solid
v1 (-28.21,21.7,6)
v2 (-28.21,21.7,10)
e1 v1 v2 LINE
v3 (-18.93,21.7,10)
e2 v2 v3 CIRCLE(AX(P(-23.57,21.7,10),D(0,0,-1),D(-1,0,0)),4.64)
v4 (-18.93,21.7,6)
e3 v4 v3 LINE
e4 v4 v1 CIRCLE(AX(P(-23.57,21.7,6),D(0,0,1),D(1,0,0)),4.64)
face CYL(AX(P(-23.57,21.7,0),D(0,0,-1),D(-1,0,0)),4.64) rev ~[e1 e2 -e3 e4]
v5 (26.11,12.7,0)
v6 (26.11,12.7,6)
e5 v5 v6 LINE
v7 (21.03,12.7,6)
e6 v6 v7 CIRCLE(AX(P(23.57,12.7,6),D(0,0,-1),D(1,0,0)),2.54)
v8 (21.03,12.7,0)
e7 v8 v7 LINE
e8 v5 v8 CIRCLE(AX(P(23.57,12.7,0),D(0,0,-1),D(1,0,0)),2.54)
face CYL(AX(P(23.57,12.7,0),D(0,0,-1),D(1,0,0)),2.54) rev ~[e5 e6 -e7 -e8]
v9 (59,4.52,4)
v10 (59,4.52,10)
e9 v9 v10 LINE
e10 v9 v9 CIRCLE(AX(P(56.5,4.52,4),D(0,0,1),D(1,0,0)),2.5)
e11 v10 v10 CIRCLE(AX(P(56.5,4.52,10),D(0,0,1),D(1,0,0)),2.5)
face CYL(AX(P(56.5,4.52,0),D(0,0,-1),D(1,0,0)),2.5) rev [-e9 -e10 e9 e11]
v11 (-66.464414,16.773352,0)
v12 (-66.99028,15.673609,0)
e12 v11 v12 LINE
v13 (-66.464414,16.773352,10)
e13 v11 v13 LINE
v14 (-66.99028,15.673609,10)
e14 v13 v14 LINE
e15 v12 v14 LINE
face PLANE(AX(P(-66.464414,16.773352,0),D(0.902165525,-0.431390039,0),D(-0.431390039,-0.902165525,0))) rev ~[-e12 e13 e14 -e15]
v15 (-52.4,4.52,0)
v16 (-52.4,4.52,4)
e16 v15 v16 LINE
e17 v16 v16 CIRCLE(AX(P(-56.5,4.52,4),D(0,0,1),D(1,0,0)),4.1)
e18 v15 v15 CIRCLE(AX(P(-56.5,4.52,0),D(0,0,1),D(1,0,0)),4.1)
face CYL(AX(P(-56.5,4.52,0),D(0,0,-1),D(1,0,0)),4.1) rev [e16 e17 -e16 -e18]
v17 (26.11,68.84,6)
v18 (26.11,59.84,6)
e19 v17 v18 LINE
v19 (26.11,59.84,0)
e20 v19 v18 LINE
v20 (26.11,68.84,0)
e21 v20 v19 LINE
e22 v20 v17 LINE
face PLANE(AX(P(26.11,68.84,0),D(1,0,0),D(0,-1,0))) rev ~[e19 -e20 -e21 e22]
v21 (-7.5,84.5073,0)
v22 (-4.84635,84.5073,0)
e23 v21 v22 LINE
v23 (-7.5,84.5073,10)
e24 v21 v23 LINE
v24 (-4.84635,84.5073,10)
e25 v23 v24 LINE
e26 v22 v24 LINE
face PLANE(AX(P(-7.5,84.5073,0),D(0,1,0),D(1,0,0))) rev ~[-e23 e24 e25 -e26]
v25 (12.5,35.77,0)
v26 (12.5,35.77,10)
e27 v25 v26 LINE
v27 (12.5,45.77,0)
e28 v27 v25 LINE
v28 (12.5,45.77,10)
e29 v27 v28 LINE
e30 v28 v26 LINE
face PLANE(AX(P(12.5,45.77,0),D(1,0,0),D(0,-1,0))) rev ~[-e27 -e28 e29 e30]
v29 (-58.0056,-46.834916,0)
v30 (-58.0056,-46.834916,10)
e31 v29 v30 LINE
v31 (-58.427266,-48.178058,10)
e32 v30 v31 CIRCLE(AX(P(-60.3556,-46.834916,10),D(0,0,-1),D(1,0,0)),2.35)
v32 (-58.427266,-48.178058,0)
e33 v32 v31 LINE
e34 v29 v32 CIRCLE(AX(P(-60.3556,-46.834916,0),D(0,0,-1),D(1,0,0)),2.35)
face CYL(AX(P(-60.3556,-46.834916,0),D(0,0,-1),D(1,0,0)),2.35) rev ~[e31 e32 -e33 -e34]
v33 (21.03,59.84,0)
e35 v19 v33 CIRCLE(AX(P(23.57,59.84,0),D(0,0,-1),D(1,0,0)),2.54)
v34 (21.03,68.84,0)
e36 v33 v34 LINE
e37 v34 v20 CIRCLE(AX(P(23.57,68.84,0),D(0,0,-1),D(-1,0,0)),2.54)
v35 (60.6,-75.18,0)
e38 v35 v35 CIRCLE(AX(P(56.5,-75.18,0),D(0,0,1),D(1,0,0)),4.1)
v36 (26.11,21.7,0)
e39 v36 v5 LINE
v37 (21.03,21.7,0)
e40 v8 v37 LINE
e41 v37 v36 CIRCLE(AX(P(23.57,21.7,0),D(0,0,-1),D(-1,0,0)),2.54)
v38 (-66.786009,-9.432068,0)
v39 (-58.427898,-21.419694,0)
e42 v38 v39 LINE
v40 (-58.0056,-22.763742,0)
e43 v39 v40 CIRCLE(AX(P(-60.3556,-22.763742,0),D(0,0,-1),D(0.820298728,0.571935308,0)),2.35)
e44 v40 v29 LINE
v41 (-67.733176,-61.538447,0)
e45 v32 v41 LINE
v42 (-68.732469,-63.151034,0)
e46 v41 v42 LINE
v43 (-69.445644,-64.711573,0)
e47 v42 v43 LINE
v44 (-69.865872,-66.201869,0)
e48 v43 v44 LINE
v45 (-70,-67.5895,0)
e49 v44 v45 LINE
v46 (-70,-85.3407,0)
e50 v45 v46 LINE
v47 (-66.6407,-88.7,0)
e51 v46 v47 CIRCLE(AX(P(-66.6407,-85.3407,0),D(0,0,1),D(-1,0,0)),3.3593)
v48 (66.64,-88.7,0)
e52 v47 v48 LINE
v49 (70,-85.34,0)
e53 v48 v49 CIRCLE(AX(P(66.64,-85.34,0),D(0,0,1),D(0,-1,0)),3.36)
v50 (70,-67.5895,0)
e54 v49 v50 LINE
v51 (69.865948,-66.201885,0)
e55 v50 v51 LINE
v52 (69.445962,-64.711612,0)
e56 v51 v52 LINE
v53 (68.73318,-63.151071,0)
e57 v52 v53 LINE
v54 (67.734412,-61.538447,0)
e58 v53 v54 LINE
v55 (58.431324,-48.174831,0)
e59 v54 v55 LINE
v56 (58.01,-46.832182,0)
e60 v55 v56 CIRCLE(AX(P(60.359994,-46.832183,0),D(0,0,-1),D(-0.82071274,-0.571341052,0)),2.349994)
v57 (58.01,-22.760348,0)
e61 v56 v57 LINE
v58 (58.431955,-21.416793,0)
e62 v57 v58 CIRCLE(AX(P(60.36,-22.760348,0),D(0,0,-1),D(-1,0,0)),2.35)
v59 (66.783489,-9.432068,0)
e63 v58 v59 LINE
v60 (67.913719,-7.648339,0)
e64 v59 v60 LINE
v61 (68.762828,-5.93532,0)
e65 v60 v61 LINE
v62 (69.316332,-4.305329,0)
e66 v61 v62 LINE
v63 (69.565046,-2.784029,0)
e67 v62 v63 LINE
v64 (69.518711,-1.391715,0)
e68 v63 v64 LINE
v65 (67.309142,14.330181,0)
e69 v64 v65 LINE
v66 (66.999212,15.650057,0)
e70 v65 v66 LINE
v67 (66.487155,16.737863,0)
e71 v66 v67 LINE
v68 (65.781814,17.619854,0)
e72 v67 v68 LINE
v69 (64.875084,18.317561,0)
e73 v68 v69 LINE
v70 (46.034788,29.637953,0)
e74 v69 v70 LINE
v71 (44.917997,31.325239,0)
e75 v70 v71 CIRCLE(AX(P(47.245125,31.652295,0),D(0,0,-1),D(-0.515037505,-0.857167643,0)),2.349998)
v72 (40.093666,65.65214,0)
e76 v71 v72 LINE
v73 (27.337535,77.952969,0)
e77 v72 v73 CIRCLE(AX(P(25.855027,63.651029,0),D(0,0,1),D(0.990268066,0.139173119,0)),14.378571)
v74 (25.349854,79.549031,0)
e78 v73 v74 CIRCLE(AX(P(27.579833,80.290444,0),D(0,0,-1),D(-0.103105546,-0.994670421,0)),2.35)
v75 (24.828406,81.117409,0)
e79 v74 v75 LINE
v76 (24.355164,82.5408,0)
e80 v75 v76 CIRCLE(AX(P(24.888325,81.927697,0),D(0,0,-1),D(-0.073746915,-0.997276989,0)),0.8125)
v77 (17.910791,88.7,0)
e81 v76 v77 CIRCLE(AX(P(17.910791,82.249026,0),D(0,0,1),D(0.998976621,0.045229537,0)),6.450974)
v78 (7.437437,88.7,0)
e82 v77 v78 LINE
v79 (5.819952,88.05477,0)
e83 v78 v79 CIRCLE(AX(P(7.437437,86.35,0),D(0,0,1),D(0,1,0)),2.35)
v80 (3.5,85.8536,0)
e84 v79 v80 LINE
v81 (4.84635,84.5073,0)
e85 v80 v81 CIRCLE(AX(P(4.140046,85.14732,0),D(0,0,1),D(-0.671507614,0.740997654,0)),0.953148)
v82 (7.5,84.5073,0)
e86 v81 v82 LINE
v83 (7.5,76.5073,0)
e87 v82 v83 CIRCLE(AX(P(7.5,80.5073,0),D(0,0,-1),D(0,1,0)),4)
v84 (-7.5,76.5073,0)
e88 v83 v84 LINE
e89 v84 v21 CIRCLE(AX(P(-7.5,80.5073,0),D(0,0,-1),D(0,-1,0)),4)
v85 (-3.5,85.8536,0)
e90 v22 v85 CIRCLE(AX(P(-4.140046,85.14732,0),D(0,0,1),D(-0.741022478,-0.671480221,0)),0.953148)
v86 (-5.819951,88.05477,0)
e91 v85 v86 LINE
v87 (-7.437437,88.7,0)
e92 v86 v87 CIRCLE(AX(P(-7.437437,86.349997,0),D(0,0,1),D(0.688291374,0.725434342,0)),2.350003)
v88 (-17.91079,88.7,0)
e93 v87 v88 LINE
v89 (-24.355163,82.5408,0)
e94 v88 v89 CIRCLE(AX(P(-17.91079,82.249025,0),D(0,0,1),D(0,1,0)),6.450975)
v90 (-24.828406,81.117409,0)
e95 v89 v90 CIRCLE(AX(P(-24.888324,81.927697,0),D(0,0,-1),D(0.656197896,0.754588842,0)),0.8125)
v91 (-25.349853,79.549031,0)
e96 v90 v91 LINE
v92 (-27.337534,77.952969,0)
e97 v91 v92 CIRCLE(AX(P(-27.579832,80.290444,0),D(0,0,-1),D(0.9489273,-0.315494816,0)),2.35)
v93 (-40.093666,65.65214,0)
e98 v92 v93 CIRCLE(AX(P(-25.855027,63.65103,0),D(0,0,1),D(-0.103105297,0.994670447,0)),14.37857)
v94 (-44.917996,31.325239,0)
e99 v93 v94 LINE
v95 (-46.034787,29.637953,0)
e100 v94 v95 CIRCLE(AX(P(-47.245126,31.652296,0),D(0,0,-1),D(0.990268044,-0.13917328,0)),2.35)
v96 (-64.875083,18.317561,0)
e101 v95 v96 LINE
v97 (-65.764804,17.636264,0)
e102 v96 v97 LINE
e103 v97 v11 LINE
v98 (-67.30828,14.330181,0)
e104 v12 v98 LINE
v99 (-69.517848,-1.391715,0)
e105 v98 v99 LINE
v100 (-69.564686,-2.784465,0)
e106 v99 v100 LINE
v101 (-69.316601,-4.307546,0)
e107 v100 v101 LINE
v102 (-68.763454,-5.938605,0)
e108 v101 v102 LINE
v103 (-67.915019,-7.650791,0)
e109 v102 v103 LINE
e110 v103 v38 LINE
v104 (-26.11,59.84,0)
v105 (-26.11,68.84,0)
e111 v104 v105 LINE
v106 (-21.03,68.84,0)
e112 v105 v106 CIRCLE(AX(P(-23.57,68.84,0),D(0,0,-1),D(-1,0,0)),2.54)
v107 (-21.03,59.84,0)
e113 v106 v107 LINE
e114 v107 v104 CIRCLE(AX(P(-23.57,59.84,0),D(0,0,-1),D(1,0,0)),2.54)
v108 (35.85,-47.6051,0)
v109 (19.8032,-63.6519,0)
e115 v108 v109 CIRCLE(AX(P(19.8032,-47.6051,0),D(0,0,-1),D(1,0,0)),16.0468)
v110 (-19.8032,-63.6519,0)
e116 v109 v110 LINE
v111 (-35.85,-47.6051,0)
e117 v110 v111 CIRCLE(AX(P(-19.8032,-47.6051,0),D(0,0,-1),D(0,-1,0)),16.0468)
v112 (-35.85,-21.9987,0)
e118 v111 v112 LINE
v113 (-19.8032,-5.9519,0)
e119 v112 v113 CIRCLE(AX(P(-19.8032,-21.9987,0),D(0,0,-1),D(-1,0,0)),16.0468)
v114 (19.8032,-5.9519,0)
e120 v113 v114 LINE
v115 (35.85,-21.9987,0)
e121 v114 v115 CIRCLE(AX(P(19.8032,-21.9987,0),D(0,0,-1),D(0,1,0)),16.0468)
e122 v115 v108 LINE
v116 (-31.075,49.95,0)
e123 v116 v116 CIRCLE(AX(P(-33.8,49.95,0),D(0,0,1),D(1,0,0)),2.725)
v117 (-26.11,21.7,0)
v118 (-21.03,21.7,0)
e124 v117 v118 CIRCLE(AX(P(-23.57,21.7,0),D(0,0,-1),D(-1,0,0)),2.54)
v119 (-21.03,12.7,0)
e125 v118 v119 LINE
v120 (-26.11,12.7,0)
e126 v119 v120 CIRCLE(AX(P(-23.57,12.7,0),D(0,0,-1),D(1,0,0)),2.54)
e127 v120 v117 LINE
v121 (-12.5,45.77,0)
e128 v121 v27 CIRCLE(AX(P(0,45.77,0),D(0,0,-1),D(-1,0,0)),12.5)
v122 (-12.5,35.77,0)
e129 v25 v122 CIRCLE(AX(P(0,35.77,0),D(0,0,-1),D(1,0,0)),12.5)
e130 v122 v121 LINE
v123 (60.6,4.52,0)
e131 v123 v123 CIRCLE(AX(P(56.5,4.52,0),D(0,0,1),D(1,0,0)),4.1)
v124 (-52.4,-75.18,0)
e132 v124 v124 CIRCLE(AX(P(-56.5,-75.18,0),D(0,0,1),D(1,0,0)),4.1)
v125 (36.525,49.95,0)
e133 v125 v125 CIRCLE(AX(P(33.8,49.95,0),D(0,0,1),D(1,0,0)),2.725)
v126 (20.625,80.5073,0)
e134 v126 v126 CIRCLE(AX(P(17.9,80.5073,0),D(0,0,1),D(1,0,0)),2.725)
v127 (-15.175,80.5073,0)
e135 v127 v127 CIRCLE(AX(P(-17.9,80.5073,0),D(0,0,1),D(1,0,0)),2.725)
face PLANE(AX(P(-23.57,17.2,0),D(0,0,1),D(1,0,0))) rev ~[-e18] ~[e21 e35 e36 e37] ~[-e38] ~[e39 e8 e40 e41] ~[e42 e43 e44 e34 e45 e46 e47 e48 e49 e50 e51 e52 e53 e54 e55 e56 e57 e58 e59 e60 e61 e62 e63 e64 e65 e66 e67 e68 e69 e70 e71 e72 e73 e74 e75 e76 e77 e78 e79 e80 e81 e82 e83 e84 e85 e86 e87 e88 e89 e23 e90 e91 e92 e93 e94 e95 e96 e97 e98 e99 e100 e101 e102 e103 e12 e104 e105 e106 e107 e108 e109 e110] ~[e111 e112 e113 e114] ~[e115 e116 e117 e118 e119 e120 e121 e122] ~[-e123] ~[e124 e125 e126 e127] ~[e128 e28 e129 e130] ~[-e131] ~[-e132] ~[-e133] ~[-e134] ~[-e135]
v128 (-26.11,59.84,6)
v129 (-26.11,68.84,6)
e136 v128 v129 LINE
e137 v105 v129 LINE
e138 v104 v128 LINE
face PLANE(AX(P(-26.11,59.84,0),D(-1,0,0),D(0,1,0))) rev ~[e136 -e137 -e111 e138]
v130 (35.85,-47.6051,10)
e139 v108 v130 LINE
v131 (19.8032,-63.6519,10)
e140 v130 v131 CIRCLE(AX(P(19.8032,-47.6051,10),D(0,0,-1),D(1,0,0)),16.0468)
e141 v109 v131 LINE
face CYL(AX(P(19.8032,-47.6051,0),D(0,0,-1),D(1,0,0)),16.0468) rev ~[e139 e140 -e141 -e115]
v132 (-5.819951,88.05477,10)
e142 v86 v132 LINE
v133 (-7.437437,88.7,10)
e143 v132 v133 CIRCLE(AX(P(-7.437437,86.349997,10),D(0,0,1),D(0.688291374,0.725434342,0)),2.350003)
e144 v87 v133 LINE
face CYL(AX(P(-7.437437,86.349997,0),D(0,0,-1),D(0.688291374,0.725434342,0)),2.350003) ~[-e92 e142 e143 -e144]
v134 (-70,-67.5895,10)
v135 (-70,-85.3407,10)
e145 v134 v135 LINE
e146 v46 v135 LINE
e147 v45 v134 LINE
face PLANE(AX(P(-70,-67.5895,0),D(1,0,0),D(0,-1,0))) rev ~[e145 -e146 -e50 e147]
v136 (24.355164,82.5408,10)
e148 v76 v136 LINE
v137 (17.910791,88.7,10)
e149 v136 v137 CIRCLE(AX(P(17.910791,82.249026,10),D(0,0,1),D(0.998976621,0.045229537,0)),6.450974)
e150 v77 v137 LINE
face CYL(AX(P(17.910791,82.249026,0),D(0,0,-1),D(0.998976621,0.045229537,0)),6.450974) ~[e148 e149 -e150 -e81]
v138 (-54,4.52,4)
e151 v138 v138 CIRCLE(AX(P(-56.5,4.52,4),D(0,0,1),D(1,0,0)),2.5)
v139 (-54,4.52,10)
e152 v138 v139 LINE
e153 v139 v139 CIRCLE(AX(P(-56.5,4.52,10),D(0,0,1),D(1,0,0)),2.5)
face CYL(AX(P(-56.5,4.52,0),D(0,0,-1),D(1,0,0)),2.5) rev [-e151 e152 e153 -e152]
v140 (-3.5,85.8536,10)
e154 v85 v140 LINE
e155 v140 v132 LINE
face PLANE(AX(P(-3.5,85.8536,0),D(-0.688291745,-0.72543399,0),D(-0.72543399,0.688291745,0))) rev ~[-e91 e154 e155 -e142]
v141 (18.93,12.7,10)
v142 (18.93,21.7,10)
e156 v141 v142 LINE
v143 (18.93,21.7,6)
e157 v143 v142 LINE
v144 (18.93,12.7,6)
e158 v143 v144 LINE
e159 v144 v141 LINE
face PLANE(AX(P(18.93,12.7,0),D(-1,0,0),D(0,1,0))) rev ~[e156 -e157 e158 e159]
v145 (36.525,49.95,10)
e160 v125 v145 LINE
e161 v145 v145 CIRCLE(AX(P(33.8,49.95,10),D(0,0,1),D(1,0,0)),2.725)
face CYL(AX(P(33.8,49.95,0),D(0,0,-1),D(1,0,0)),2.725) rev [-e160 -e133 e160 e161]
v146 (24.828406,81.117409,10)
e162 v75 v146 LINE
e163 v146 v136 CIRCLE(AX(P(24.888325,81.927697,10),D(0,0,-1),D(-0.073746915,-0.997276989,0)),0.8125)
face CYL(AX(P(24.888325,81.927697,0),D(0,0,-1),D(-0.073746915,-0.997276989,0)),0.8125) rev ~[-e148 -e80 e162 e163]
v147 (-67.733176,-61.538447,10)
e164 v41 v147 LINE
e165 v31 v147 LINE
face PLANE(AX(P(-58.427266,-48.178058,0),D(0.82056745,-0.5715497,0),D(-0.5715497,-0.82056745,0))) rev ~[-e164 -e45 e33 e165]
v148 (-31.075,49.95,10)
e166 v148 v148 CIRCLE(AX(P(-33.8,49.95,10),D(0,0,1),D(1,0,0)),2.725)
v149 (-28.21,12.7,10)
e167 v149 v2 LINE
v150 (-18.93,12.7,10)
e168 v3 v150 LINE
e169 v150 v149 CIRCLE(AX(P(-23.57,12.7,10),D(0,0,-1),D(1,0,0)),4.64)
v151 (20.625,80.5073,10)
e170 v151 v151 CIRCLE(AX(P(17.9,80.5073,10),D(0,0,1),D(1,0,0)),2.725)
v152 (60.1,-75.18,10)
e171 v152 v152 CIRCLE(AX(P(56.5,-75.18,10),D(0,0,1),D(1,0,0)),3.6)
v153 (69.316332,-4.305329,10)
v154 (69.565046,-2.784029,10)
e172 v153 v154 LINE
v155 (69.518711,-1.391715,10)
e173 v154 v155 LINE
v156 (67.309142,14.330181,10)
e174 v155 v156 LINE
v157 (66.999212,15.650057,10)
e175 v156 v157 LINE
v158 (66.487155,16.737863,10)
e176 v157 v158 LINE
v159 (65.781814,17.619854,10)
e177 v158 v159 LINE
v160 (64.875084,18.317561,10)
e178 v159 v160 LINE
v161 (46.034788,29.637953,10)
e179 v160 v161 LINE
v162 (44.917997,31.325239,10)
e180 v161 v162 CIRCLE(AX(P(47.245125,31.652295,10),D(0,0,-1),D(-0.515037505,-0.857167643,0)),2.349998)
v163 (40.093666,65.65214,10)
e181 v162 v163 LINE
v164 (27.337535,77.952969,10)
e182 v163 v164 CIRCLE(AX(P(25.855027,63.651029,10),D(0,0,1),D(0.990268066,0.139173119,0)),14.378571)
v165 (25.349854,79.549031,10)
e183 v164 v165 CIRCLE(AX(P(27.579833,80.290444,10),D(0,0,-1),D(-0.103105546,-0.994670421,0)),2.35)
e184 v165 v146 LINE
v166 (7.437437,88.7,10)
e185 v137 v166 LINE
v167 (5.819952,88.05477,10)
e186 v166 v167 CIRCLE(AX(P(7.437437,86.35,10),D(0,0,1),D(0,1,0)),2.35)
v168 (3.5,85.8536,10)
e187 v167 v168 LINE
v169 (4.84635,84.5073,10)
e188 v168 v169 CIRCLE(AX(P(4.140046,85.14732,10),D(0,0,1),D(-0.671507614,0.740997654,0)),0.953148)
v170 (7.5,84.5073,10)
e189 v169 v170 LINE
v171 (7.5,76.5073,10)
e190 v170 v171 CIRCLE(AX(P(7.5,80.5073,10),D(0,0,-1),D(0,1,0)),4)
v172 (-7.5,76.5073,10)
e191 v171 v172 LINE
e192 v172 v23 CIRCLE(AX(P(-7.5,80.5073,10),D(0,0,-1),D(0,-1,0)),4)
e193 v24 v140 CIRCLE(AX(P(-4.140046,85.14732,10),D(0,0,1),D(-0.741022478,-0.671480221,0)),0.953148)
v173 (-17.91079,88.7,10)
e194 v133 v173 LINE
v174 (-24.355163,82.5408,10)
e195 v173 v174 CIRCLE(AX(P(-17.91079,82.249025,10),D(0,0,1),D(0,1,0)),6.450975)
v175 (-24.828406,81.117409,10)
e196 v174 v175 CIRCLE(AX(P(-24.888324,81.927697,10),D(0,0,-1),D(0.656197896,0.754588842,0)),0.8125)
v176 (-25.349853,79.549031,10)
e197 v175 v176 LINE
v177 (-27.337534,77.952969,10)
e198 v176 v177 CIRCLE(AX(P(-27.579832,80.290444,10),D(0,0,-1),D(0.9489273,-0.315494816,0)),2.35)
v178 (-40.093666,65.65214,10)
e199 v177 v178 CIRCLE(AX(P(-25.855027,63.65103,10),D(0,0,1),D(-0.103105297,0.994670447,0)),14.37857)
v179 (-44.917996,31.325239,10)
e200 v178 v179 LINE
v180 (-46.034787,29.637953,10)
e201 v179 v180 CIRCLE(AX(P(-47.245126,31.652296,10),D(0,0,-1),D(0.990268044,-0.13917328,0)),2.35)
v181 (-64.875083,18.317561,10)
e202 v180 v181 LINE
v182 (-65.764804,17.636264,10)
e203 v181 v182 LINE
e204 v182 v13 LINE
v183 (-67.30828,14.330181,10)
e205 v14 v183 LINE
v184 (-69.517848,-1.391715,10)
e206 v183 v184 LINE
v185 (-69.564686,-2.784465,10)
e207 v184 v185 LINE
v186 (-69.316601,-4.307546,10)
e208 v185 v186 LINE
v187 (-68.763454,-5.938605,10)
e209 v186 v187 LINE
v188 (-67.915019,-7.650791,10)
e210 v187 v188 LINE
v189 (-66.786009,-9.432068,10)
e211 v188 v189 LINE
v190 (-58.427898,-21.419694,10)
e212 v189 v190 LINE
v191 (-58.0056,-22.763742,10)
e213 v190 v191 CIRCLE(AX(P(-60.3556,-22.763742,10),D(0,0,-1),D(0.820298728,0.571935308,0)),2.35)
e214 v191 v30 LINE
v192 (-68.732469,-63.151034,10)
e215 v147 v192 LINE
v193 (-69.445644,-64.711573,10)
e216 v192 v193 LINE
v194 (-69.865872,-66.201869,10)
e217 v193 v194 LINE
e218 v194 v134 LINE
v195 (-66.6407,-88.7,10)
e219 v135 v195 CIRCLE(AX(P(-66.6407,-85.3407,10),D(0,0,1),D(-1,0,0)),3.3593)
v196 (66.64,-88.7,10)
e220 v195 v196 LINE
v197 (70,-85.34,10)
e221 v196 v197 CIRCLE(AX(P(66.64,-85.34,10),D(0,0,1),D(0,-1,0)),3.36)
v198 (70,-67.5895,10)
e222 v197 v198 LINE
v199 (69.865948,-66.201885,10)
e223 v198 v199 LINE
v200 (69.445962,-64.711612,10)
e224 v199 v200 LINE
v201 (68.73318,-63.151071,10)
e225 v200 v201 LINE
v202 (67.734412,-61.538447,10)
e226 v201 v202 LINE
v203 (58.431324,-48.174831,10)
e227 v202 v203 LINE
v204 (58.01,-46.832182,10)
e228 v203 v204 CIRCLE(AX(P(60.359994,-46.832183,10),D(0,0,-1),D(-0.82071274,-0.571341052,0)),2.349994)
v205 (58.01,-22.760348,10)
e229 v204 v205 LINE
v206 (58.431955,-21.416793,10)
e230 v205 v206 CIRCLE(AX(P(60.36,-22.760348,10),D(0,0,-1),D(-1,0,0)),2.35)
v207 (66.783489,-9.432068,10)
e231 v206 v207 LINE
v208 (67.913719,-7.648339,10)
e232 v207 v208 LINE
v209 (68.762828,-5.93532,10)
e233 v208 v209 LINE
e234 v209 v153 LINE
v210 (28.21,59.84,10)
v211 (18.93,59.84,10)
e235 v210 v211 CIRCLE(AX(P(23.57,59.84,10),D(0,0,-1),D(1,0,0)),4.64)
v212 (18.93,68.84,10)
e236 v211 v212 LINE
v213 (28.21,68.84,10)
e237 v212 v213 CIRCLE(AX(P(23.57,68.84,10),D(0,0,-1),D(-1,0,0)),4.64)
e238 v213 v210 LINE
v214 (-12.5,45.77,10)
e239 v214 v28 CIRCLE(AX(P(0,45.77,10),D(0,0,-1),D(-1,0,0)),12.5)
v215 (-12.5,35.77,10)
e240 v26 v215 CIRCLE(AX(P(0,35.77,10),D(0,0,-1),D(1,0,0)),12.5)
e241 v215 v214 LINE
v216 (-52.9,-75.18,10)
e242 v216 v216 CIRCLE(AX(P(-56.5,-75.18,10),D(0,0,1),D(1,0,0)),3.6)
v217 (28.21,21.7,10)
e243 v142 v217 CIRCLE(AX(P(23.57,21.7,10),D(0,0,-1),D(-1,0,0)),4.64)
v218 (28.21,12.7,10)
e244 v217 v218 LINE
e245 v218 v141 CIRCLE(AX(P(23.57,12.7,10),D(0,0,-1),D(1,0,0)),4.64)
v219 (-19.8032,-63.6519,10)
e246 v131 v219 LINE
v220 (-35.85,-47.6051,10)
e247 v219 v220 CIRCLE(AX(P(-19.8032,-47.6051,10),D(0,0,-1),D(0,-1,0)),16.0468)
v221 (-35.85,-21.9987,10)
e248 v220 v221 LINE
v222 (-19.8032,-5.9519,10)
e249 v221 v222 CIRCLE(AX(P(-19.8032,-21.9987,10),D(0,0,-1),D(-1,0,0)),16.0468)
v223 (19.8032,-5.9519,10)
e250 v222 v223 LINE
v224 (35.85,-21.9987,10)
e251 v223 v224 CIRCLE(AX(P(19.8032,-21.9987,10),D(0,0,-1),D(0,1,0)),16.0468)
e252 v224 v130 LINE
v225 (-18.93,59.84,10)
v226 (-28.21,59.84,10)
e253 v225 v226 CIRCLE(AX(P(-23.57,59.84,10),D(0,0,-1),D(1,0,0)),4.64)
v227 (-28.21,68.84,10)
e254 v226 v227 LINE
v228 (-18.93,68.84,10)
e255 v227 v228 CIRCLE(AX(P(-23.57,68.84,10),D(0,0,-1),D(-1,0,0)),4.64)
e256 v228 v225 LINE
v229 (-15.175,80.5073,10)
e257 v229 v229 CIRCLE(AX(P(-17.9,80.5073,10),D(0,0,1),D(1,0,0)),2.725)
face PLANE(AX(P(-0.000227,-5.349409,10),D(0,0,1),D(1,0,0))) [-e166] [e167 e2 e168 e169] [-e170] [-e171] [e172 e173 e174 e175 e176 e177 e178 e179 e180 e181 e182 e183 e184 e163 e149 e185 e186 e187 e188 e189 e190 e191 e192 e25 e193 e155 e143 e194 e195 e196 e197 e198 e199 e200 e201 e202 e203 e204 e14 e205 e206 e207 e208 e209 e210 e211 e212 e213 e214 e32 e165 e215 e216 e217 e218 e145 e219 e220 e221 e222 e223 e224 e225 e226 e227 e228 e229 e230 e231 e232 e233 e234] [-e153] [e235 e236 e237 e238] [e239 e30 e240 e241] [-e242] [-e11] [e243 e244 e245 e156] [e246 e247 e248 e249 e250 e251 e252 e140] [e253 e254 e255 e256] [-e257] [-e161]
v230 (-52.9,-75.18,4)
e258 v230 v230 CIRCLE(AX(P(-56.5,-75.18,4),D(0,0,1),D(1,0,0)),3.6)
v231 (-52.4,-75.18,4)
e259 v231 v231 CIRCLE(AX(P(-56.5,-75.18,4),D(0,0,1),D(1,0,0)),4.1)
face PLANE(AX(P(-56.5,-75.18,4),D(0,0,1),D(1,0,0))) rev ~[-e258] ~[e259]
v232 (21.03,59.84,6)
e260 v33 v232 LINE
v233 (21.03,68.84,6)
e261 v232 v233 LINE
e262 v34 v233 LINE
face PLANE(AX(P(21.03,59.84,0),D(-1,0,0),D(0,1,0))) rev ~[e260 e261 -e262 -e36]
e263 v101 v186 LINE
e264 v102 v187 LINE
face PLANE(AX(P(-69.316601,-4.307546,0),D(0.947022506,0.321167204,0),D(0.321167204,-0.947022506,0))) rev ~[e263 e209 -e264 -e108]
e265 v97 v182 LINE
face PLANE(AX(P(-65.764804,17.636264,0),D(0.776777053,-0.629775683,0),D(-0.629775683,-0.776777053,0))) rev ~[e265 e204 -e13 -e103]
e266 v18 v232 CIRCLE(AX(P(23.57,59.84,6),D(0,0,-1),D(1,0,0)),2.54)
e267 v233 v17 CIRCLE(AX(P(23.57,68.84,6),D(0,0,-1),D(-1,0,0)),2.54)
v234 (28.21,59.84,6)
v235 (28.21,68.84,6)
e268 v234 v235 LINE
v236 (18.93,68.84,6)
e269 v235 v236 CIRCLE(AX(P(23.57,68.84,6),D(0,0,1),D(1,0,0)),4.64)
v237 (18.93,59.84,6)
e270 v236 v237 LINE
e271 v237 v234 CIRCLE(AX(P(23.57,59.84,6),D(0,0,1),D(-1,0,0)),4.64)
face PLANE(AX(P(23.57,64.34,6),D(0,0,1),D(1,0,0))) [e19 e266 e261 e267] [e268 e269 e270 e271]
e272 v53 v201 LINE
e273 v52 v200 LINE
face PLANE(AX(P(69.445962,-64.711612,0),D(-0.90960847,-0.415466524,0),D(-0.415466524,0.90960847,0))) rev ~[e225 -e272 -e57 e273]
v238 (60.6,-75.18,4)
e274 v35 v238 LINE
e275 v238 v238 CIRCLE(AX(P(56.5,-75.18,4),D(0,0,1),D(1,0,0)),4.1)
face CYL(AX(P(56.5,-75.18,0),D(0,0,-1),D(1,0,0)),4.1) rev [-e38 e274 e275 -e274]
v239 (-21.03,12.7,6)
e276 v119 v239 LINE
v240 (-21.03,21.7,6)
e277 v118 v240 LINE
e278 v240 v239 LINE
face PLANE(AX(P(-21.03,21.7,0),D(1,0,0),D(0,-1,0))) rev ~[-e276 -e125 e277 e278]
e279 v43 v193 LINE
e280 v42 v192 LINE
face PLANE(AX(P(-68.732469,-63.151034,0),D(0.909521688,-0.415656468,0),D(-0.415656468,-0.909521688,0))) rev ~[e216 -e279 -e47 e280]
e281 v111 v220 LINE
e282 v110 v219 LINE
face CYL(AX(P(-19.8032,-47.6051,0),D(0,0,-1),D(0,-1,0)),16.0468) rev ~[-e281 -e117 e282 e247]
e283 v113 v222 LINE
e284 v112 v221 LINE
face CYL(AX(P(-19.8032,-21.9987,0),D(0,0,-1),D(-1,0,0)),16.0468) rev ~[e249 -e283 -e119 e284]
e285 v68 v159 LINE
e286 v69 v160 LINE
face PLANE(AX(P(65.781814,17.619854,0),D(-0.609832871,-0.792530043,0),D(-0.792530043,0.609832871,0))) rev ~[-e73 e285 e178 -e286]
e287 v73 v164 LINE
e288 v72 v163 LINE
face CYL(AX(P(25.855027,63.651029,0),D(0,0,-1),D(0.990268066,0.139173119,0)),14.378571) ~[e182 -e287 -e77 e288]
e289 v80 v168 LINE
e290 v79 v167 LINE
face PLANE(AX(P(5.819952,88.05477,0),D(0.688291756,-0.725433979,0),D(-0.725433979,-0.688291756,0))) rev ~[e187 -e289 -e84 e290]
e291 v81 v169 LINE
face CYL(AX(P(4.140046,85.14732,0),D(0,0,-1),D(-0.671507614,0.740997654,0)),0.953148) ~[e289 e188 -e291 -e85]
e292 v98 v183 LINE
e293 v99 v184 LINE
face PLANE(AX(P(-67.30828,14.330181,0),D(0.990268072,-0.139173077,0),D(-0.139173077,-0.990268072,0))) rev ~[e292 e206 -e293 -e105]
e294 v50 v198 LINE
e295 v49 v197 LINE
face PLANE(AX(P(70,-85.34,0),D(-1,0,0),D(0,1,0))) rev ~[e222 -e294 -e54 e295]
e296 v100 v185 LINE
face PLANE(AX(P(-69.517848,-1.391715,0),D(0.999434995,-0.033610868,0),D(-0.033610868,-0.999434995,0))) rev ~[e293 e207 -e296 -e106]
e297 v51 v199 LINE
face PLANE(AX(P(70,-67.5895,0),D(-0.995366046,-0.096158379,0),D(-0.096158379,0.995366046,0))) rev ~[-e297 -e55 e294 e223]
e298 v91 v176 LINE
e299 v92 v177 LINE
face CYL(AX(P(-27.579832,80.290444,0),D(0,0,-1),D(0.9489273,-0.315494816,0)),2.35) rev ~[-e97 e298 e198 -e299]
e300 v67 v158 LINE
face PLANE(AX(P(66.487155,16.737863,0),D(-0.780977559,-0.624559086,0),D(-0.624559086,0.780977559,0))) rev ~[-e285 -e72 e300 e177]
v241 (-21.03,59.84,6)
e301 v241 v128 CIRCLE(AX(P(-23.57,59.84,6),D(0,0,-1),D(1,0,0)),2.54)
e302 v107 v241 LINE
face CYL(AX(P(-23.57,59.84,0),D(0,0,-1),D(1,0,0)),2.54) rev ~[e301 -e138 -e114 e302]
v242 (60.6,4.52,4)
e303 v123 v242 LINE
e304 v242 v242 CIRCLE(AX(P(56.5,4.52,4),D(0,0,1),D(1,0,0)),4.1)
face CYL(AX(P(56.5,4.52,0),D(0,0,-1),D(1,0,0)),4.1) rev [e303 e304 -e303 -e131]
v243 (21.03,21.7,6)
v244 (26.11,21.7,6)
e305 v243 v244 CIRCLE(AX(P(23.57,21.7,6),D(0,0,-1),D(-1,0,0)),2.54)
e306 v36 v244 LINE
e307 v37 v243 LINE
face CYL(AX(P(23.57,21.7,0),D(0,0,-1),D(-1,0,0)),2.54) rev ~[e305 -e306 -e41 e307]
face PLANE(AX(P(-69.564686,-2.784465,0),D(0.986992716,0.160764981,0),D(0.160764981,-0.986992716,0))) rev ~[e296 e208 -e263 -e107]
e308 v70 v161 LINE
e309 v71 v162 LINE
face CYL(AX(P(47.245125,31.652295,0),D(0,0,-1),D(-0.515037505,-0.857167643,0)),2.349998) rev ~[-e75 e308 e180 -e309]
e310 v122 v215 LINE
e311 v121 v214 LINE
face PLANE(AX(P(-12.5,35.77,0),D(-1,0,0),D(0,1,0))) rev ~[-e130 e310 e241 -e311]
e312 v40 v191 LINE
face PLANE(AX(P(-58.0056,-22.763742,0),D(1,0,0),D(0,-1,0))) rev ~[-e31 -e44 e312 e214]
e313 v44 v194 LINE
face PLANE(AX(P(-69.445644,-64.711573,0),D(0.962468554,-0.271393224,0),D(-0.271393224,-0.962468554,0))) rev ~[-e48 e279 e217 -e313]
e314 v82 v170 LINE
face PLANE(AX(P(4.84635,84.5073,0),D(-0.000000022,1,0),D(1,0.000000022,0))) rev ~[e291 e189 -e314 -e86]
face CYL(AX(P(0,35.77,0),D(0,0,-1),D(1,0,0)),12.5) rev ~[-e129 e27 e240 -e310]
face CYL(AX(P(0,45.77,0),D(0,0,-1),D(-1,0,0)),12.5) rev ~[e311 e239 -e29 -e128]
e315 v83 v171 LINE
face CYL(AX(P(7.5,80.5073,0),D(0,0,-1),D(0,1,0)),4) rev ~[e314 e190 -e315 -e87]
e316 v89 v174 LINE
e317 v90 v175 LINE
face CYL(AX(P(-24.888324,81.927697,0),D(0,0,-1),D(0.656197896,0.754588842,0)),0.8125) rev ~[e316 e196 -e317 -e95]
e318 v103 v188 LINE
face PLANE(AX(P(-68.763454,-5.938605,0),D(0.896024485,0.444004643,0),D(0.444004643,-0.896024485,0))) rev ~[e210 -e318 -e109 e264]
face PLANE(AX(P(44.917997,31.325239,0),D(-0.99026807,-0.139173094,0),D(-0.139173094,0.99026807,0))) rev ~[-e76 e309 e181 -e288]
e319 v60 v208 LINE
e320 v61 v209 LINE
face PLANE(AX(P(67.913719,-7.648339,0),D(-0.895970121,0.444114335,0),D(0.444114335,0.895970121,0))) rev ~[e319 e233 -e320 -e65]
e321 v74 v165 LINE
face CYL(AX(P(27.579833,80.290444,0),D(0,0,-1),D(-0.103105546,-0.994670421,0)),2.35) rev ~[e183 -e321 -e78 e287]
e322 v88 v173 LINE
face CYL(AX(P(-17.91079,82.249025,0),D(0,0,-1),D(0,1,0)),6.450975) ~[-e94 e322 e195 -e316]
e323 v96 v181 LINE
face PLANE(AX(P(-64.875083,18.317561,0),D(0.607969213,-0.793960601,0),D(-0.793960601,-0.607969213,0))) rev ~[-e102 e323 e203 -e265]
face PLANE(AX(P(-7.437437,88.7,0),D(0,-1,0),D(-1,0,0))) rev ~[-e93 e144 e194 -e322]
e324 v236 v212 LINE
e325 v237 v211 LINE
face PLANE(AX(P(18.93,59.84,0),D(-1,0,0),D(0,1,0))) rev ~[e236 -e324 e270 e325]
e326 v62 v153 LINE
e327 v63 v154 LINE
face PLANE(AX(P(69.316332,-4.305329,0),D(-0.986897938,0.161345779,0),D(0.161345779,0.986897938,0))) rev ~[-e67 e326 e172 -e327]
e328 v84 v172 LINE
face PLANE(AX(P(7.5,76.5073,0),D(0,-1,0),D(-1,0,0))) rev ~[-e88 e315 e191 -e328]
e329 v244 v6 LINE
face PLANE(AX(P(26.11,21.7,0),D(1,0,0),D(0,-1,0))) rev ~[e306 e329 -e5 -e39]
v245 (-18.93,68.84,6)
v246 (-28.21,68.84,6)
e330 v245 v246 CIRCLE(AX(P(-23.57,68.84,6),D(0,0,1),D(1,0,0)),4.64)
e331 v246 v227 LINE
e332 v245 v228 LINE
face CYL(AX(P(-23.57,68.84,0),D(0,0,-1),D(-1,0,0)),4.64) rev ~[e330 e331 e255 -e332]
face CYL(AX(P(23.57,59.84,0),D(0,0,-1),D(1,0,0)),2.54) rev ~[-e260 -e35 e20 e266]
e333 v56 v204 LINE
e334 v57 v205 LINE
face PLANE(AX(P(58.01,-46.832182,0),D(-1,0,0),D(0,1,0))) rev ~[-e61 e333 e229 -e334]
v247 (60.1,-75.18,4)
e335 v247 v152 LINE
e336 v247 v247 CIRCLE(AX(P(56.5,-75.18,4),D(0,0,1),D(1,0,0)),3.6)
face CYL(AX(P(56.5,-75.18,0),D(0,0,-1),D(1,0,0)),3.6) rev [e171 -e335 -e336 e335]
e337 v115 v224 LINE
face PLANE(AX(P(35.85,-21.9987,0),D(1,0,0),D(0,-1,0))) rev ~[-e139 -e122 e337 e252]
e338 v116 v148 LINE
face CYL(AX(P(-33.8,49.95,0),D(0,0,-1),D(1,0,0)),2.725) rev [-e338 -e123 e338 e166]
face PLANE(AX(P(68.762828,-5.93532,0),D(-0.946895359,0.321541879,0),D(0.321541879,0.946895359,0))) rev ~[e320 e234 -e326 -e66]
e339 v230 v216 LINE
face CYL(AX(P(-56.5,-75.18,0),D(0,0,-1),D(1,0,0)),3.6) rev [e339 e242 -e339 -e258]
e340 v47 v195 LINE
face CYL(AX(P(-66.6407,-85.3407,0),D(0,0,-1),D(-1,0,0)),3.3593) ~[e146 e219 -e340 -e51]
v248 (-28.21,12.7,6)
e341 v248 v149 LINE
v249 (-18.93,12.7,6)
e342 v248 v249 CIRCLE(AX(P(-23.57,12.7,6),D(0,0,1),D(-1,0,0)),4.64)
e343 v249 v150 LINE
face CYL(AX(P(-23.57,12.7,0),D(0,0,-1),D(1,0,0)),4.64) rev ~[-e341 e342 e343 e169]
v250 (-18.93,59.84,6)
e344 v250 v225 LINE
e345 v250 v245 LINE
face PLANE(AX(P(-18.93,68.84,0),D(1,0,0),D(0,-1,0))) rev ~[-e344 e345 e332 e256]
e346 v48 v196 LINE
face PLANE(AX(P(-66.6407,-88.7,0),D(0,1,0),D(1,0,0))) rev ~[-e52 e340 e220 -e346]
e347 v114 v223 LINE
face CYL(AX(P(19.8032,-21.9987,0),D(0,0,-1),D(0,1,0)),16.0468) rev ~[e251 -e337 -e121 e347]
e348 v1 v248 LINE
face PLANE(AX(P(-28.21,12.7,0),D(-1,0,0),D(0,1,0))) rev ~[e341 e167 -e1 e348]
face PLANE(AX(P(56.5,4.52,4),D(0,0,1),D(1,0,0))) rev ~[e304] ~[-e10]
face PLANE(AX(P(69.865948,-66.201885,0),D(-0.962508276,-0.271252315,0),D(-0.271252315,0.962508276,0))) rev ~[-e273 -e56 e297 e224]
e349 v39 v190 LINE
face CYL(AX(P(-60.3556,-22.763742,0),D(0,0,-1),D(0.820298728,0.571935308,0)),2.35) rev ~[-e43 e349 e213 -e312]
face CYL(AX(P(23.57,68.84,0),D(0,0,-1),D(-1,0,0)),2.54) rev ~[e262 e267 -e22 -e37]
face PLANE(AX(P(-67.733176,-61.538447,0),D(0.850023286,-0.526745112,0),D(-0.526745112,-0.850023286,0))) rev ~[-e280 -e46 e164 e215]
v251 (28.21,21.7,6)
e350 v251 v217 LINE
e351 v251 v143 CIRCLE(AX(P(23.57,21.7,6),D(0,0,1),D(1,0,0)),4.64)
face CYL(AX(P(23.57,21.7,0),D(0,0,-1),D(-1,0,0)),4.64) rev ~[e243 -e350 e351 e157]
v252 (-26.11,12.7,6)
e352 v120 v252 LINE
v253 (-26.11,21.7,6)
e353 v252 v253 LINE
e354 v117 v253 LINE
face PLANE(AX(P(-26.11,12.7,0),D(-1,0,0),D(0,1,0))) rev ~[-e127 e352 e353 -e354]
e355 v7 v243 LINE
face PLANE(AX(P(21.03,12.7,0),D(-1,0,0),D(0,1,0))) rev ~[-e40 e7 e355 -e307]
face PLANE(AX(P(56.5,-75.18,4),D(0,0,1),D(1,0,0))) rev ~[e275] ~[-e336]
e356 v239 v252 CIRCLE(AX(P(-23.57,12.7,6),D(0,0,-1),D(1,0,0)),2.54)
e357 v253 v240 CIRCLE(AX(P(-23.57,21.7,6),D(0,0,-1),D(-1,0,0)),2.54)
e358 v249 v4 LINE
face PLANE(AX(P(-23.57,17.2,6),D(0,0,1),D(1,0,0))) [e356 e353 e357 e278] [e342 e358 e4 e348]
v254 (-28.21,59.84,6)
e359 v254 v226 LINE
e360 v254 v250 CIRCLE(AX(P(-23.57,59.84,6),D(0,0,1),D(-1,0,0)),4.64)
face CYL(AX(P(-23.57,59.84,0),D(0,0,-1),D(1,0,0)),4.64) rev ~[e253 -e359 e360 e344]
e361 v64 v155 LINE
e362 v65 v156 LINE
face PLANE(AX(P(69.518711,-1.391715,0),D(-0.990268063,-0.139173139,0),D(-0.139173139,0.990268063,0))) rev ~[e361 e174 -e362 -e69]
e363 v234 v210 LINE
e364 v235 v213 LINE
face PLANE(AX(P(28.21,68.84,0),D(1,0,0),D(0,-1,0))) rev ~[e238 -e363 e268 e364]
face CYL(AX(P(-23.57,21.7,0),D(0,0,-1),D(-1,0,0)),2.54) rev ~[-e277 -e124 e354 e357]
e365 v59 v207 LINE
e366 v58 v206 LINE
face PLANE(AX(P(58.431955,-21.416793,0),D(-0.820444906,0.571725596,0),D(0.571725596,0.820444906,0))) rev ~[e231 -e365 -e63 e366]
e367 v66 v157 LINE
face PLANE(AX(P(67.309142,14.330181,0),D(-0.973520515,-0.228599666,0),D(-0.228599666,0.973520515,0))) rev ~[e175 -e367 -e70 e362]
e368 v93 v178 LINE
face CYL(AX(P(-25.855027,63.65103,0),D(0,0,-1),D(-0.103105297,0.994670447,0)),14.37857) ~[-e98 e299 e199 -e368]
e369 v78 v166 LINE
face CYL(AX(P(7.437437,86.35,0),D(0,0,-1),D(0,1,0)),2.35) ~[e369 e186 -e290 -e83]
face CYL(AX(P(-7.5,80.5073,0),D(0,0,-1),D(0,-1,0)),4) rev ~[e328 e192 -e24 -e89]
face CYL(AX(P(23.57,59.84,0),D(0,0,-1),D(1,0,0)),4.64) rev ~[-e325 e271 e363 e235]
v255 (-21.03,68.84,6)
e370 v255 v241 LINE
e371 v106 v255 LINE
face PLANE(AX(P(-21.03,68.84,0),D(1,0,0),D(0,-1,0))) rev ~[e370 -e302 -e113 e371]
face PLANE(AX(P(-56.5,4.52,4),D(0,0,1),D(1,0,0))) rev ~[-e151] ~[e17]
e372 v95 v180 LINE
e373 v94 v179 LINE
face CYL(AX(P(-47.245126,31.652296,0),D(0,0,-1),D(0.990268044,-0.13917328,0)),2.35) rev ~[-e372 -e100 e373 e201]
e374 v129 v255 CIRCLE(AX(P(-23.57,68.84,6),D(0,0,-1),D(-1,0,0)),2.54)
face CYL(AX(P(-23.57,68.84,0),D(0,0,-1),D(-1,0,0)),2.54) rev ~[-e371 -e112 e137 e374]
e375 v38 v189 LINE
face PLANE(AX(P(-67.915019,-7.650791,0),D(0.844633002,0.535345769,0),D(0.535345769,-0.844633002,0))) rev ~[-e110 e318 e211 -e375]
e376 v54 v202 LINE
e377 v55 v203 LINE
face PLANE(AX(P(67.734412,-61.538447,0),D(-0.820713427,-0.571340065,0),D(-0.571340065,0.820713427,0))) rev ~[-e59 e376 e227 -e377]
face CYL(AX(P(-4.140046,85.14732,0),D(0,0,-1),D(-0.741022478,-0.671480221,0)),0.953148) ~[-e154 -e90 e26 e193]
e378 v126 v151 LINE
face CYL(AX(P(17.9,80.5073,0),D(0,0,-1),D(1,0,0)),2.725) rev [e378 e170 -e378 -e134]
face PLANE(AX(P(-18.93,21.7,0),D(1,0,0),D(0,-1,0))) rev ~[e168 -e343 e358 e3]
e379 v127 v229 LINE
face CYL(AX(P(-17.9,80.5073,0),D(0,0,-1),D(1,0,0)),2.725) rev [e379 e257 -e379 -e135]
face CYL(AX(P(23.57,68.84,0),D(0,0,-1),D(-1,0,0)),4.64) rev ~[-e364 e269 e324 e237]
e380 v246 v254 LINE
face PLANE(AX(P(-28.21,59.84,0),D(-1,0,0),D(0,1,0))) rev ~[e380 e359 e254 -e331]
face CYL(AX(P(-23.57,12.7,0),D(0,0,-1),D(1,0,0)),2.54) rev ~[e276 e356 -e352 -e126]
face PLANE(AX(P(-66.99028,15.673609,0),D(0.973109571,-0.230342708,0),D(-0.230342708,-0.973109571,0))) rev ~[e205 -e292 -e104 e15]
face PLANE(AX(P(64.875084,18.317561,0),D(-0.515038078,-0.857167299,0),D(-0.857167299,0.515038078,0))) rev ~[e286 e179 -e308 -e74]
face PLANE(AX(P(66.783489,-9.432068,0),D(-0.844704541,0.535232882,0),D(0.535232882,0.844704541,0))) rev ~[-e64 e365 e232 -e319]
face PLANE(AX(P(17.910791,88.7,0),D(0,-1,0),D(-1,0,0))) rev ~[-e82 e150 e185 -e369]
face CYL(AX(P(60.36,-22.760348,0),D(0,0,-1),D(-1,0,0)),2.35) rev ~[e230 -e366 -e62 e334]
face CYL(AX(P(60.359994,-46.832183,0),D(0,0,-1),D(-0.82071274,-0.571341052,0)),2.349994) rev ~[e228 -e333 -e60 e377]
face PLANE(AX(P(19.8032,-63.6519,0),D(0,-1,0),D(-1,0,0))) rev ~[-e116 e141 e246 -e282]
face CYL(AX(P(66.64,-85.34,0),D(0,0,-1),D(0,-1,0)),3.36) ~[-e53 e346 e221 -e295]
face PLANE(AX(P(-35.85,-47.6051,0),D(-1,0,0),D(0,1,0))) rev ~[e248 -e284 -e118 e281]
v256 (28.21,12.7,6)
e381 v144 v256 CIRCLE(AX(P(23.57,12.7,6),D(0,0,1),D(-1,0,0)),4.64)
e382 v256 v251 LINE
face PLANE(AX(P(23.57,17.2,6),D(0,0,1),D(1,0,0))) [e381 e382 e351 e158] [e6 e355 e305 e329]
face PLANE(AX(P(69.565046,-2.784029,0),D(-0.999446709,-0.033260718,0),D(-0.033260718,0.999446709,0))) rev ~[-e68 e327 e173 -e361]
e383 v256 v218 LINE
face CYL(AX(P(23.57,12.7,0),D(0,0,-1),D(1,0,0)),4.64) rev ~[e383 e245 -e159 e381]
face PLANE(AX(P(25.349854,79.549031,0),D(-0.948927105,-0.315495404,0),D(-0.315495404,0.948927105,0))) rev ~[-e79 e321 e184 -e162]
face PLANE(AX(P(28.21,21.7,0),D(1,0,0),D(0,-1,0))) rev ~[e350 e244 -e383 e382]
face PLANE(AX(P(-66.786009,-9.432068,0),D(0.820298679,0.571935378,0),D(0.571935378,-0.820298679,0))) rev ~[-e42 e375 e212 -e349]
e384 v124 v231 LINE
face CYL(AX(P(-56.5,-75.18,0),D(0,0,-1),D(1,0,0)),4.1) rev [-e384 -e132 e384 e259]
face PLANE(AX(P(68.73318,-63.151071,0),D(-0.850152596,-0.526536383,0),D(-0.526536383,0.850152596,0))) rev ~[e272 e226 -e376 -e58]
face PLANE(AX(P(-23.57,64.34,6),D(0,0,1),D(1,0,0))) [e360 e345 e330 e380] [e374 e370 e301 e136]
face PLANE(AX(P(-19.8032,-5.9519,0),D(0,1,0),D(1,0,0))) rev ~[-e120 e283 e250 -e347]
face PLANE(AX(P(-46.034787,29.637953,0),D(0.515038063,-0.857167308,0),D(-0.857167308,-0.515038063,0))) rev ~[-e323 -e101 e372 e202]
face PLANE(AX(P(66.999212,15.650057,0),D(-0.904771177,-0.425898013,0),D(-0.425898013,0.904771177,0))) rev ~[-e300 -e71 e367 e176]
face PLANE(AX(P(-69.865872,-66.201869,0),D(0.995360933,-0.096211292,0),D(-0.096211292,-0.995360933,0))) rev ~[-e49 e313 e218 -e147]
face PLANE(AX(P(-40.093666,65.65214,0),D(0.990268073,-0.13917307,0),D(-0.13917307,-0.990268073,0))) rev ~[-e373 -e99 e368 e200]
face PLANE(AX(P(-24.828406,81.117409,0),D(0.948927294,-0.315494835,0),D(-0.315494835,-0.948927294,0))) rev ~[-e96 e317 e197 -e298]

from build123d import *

# Parameters (mm, degrees)
F0_R     = 4.1
F0_R_2   = 2.725
F0_R_3   = 2.5
F0_R_4   = 3.6
F1_DEPTH = 10
F2_DEPTH = 6
F3_DEPTH = 4


# Not quite as in the source:
# - ends of sketch curves that miss each other by under 0.0002 mm in the source are joined


with BuildPart() as f1:
    # F0 (on Top) → F1 (new body)
    with BuildSketch(Plane.XY):
        with BuildLine():
            ThreePointArc((-70, -85.3407), (-69.01608381, -87.71608381), (-66.6407, -88.7))
            Line((-66.6407, -88.7), (66.64, -88.7))
            ThreePointArc((66.64, -88.7), (69.0158787848, -87.7158787848), (70, -85.34))
            Line((70, -85.34), (70, -67.5895))
            Line((70, -67.5895), (69.865948, -66.201885))
            Line((69.865948, -66.201885), (69.445962, -64.711612))
            Line((69.445962, -64.711612), (68.73318, -63.151071))
            Line((68.73318, -63.151071), (67.734412, -61.538447))
            Line((67.734412, -61.538447), (58.431324, -48.174831))
            ThreePointArc((58.431324, -48.174831), (58.1178035717, -47.5357835753), (58.01, -46.832182))
            Line((58.01, -46.832182), (58.01, -22.760348))
            ThreePointArc((58.01, -22.760348), (58.1179689174, -22.0562197272), (58.4319545741, -21.4167927032))
            Line((58.4319545741, -21.4167927032), (66.783489, -9.432068))
            Line((66.783489, -9.432068), (67.913719, -7.648339))
            Line((67.913719, -7.648339), (68.762828, -5.93532))
            Line((68.762828, -5.93532), (69.316332, -4.305329))
            Line((69.316332, -4.305329), (69.565046, -2.784029))
            Line((69.565046, -2.784029), (69.518711, -1.391715))
            Line((69.518711, -1.391715), (67.309142, 14.330181))
            Line((67.309142, 14.330181), (66.999212, 15.650057))
            Line((66.999212, 15.650057), (66.487155, 16.737863))
            Line((66.487155, 16.737863), (65.781814, 17.619854))
            Line((65.781814, 17.619854), (64.875084, 18.317561))
            Line((64.875084, 18.317561), (46.034788, 29.637953))
            ThreePointArc((46.034788, 29.637953), (45.2854954651, 30.3552438624), (44.917997067, 31.3252390094))
            Line((44.917997067, 31.3252390094), (40.093666, 65.65214))
            ThreePointArc((40.093666, 65.65214), (35.8358190199, 74.0012505725), (27.3375349502, 77.9529685197))
            ThreePointArc((27.3375349502, 77.9529685197), (26.1084756666, 78.4580664195), (25.3498539146, 79.5490309716))
            Line((25.3498539146, 79.5490309716), (24.828406, 81.117409))
            ThreePointArc((24.828406, 81.117409), (24.1173215696, 81.671357459), (24.355163875, 82.5408001437))
            ThreePointArc((24.355163875, 82.5408001437), (22.3679675258, 86.9125704183), (17.910791, 88.7))
            Line((17.910791, 88.7), (7.437437, 88.7))
            ThreePointArc((7.437437, 88.7), (6.5667217917, 88.5327402562), (5.8199517771, 88.0547702349))
            Line((5.8199517771, 88.0547702349), (3.5, 85.8536))
            ThreePointArc((3.5, 85.8536), (3.4660810953, 84.4733300764), (4.8463500657, 84.5072999404))
            Line((4.8463500657, 84.5072999404), (7.5, 84.5073))
            ThreePointArc((7.5, 84.5073), (11.5, 80.5073), (7.5, 76.5073))
            Line((7.5, 76.5073), (-7.5, 76.5073))
            ThreePointArc((-7.5, 76.5073), (-11.5, 80.5073), (-7.5, 84.5073))
            Line((-7.5, 84.5073), (-4.84635, 84.5073))
            ThreePointArc((-4.84635, 84.5073), (-3.4660810953, 84.4733300764), (-3.4999997219, 85.8536003068))
            Line((-3.4999997219, 85.8536003068), (-5.819951, 88.05477))
            ThreePointArc((-5.819951, 88.05477), (-6.5667214548, 88.5327401218), (-7.437437, 88.7))
            Line((-7.437437, 88.7), (-17.91079, 88.7))
            ThreePointArc((-17.91079, 88.7), (-22.3679665258, 86.9125704183), (-24.3551631887, 82.5408000085))
            ThreePointArc((-24.3551631887, 82.5408000085), (-24.1173207269, 81.6713569858), (-24.8284060254, 81.1174093435))
            Line((-24.8284060254, 81.1174093435), (-25.349853, 79.549031))
            ThreePointArc((-25.349853, 79.549031), (-26.1084746666, 78.4580664195), (-27.3375339495, 77.9529685125))
            ThreePointArc((-27.3375339495, 77.9529685125), (-35.8358186118, 74.001250966), (-40.0936657548, 65.6521401061))
            Line((-40.0936657548, 65.6521401061), (-44.917996, 31.325239))
            ThreePointArc((-44.917996, 31.325239), (-45.2854944651, 30.3552438624), (-46.0347868046, 29.6379526747))
            Line((-46.0347868046, 29.6379526747), (-64.875083, 18.317561))
            Line((-64.875083, 18.317561), (-65.764804, 17.636264))
            Line((-65.764804, 17.636264), (-66.464414, 16.773352))
            Line((-66.464414, 16.773352), (-66.99028, 15.673609))
            Line((-66.99028, 15.673609), (-67.30828, 14.330181))
            Line((-67.30828, 14.330181), (-69.517848, -1.391715))
            Line((-69.517848, -1.391715), (-69.564686, -2.784465))
            Line((-69.564686, -2.784465), (-69.316601, -4.307546))
            Line((-69.316601, -4.307546), (-68.763454, -5.938605))
            Line((-68.763454, -5.938605), (-67.915019, -7.650791))
            Line((-67.915019, -7.650791), (-66.786009, -9.432068))
            Line((-66.786009, -9.432068), (-58.427898, -21.419694))
            ThreePointArc((-58.427898, -21.419694), (-58.1136589115, -22.059327239), (-58.0056, -22.763742))
            Line((-58.0056, -22.763742), (-58.0056, -46.834916))
            ThreePointArc((-58.0056, -46.834916), (-58.1134934129, -47.5388038122), (-58.4272664273, -48.1780577023))
            Line((-58.4272664273, -48.1780577023), (-67.733176, -61.538447))
            Line((-67.733176, -61.538447), (-68.732469, -63.151034))
            Line((-68.732469, -63.151034), (-69.445644, -64.711573))
            Line((-69.445644, -64.711573), (-69.865872, -66.201869))
            Line((-69.865872, -66.201869), (-70, -67.5895))
            Line((-70, -67.5895), (-70, -85.3407))
        make_face()
        with Locations((-56.5, -75.18)):
            Circle(F0_R, mode=Mode.SUBTRACT)
        with Locations((56.5, -75.18)):
            Circle(F0_R, mode=Mode.SUBTRACT)
        with BuildLine():
            Line((19.8032, -63.6519), (-19.8032, -63.6519))
            ThreePointArc((-19.8032, -63.6519), (-31.1500010963, -58.9519010963), (-35.85, -47.6051))
            Line((-35.85, -47.6051), (-35.85, -21.9987))
            ThreePointArc((-35.85, -21.9987), (-31.1500010963, -10.6518989037), (-19.8032, -5.9519))
            Line((-19.8032, -5.9519), (19.8032, -5.9519))
            ThreePointArc((19.8032, -5.9519), (31.1500010963, -10.6518989037), (35.85, -21.9987))
            Line((35.85, -21.9987), (35.85, -47.6051))
            ThreePointArc((35.85, -47.6051), (31.1500010963, -58.9519010963), (19.8032, -63.6519))
        make_face(mode=Mode.SUBTRACT)
        with Locations((-56.5, 4.52)):
            Circle(F0_R, mode=Mode.SUBTRACT)
        with BuildLine():
            Line((-28.21, 12.7), (-28.21, 21.7))
            ThreePointArc((-28.21, 21.7), (-23.57, 26.34), (-18.93, 21.7))
            Line((-18.93, 21.7), (-18.93, 12.7))
            ThreePointArc((-18.93, 12.7), (-23.57, 8.06), (-28.21, 12.7))
        make_face(mode=Mode.SUBTRACT)
        with Locations((-33.8, 49.95)):
            Circle(F0_R_2, mode=Mode.SUBTRACT)
        with BuildLine():
            Line((-28.21, 59.84), (-28.21, 68.84))
            ThreePointArc((-28.21, 68.84), (-23.57, 73.48), (-18.93, 68.84))
            Line((-18.93, 68.84), (-18.93, 59.84))
            ThreePointArc((-18.93, 59.84), (-23.57, 55.2), (-28.21, 59.84))
        make_face(mode=Mode.SUBTRACT)
        with Locations((-17.9, 80.5073)):
            Circle(F0_R_2, mode=Mode.SUBTRACT)
        with BuildLine():
            Line((18.93, 12.7), (18.93, 21.7))
            ThreePointArc((18.93, 21.7), (23.57, 26.34), (28.21, 21.7))
            Line((28.21, 21.7), (28.21, 12.7))
            ThreePointArc((28.21, 12.7), (23.57, 8.06), (18.93, 12.7))
        make_face(mode=Mode.SUBTRACT)
        with BuildLine():
            Line((-12.5, 35.77), (-12.5, 45.77))
            ThreePointArc((-12.5, 45.77), (0, 58.27), (12.5, 45.77))
            Line((12.5, 45.77), (12.5, 35.77))
            ThreePointArc((12.5, 35.77), (0, 23.27), (-12.5, 35.77))
        make_face(mode=Mode.SUBTRACT)
        with Locations((56.5, 4.52)):
            Circle(F0_R, mode=Mode.SUBTRACT)
        with Locations((33.8, 49.95)):
            Circle(F0_R_2, mode=Mode.SUBTRACT)
        with BuildLine():
            Line((18.93, 59.84), (18.93, 68.84))
            ThreePointArc((18.93, 68.84), (23.57, 73.48), (28.21, 68.84))
            Line((28.21, 68.84), (28.21, 59.84))
            ThreePointArc((28.21, 59.84), (23.57, 55.2), (18.93, 59.84))
        make_face(mode=Mode.SUBTRACT)
        with Locations((17.9, 80.5073)):
            Circle(F0_R_2, mode=Mode.SUBTRACT)
        with Locations((-56.5, 4.52)):
            Circle(F0_R)
        with Locations((-56.5, 4.52)):
            Circle(F0_R_3, mode=Mode.SUBTRACT)
        with Locations((56.5, 4.52)):
            Circle(F0_R)
        with Locations((56.5, 4.52)):
            Circle(F0_R_3, mode=Mode.SUBTRACT)
        with Locations((56.5, -75.18)):
            Circle(F0_R)
        with Locations((56.5, -75.18)):
            Circle(F0_R_4, mode=Mode.SUBTRACT)
        with Locations((-56.5, -75.18)):
            Circle(F0_R)
        with Locations((-56.5, -75.18)):
            Circle(F0_R_4, mode=Mode.SUBTRACT)
    extrude(amount=F1_DEPTH)

    # F0 (on Top) → F2 (join)
    with BuildSketch(Plane.XY):
        with BuildLine():
            ThreePointArc((-18.93, 21.7), (-23.57, 26.34), (-28.21, 21.7))
            Line((-28.21, 21.7), (-28.21, 12.7))
            ThreePointArc((-28.21, 12.7), (-23.57, 8.06), (-18.93, 12.7))
            Line((-18.93, 12.7), (-18.93, 21.7))
        make_face()
        with BuildLine():
            Line((-26.11, 12.7), (-26.11, 21.7))
            ThreePointArc((-26.11, 21.7), (-23.57, 24.24), (-21.03, 21.7))
            Line((-21.03, 21.7), (-21.03, 12.7))
            ThreePointArc((-21.03, 12.7), (-23.57, 10.16), (-26.11, 12.7))
        make_face(mode=Mode.SUBTRACT)
        with BuildLine():
            ThreePointArc((-18.93, 68.84), (-23.57, 73.48), (-28.21, 68.84))
            Line((-28.21, 68.84), (-28.21, 59.84))
            ThreePointArc((-28.21, 59.84), (-23.57, 55.2), (-18.93, 59.84))
            Line((-18.93, 59.84), (-18.93, 68.84))
        make_face()
        with BuildLine():
            Line((-26.11, 59.84), (-26.11, 68.84))
            ThreePointArc((-26.11, 68.84), (-23.57, 71.38), (-21.03, 68.84))
            Line((-21.03, 68.84), (-21.03, 59.84))
            ThreePointArc((-21.03, 59.84), (-23.57, 57.3), (-26.11, 59.84))
        make_face(mode=Mode.SUBTRACT)
        with BuildLine():
            ThreePointArc((28.21, 68.84), (23.57, 73.48), (18.93, 68.84))
            Line((18.93, 68.84), (18.93, 59.84))
            ThreePointArc((18.93, 59.84), (23.57, 55.2), (28.21, 59.84))
            Line((28.21, 59.84), (28.21, 68.84))
        make_face()
        with BuildLine():
            Line((21.03, 59.84), (21.03, 68.84))
            ThreePointArc((21.03, 68.84), (23.57, 71.38), (26.11, 68.84))
            Line((26.11, 68.84), (26.11, 59.84))
            ThreePointArc((26.11, 59.84), (23.57, 57.3), (21.03, 59.84))
        make_face(mode=Mode.SUBTRACT)
        with BuildLine():
            ThreePointArc((28.21, 21.7), (23.57, 26.34), (18.93, 21.7))
            Line((18.93, 21.7), (18.93, 12.7))
            ThreePointArc((18.93, 12.7), (23.57, 8.06), (28.21, 12.7))
            Line((28.21, 12.7), (28.21, 21.7))
        make_face()
        with BuildLine():
            Line((21.03, 12.7), (21.03, 21.7))
            ThreePointArc((21.03, 21.7), (23.57, 24.24), (26.11, 21.7))
            Line((26.11, 21.7), (26.11, 12.7))
            ThreePointArc((26.11, 12.7), (23.57, 10.16), (21.03, 12.7))
        make_face(mode=Mode.SUBTRACT)
    extrude(amount=F2_DEPTH)

    # F0 (on Top) → F3 (cut, through all)
    with BuildSketch(Plane.XY):
        with Locations((-56.5, -75.18)):
            Circle(F0_R)
        with Locations((-56.5, -75.18)):
            Circle(F0_R_4, mode=Mode.SUBTRACT)
        with Locations((-56.5, 4.52)):
            Circle(F0_R)
        with Locations((-56.5, 4.52)):
            Circle(F0_R_3, mode=Mode.SUBTRACT)
        with Locations((56.5, 4.52)):
            Circle(F0_R)
        with Locations((56.5, 4.52)):
            Circle(F0_R_3, mode=Mode.SUBTRACT)
        with Locations((56.5, -75.18)):
            Circle(F0_R)
        with Locations((56.5, -75.18)):
            Circle(F0_R_4, mode=Mode.SUBTRACT)
    extrude(amount=F3_DEPTH, mode=Mode.SUBTRACT)


solid = f1.part
